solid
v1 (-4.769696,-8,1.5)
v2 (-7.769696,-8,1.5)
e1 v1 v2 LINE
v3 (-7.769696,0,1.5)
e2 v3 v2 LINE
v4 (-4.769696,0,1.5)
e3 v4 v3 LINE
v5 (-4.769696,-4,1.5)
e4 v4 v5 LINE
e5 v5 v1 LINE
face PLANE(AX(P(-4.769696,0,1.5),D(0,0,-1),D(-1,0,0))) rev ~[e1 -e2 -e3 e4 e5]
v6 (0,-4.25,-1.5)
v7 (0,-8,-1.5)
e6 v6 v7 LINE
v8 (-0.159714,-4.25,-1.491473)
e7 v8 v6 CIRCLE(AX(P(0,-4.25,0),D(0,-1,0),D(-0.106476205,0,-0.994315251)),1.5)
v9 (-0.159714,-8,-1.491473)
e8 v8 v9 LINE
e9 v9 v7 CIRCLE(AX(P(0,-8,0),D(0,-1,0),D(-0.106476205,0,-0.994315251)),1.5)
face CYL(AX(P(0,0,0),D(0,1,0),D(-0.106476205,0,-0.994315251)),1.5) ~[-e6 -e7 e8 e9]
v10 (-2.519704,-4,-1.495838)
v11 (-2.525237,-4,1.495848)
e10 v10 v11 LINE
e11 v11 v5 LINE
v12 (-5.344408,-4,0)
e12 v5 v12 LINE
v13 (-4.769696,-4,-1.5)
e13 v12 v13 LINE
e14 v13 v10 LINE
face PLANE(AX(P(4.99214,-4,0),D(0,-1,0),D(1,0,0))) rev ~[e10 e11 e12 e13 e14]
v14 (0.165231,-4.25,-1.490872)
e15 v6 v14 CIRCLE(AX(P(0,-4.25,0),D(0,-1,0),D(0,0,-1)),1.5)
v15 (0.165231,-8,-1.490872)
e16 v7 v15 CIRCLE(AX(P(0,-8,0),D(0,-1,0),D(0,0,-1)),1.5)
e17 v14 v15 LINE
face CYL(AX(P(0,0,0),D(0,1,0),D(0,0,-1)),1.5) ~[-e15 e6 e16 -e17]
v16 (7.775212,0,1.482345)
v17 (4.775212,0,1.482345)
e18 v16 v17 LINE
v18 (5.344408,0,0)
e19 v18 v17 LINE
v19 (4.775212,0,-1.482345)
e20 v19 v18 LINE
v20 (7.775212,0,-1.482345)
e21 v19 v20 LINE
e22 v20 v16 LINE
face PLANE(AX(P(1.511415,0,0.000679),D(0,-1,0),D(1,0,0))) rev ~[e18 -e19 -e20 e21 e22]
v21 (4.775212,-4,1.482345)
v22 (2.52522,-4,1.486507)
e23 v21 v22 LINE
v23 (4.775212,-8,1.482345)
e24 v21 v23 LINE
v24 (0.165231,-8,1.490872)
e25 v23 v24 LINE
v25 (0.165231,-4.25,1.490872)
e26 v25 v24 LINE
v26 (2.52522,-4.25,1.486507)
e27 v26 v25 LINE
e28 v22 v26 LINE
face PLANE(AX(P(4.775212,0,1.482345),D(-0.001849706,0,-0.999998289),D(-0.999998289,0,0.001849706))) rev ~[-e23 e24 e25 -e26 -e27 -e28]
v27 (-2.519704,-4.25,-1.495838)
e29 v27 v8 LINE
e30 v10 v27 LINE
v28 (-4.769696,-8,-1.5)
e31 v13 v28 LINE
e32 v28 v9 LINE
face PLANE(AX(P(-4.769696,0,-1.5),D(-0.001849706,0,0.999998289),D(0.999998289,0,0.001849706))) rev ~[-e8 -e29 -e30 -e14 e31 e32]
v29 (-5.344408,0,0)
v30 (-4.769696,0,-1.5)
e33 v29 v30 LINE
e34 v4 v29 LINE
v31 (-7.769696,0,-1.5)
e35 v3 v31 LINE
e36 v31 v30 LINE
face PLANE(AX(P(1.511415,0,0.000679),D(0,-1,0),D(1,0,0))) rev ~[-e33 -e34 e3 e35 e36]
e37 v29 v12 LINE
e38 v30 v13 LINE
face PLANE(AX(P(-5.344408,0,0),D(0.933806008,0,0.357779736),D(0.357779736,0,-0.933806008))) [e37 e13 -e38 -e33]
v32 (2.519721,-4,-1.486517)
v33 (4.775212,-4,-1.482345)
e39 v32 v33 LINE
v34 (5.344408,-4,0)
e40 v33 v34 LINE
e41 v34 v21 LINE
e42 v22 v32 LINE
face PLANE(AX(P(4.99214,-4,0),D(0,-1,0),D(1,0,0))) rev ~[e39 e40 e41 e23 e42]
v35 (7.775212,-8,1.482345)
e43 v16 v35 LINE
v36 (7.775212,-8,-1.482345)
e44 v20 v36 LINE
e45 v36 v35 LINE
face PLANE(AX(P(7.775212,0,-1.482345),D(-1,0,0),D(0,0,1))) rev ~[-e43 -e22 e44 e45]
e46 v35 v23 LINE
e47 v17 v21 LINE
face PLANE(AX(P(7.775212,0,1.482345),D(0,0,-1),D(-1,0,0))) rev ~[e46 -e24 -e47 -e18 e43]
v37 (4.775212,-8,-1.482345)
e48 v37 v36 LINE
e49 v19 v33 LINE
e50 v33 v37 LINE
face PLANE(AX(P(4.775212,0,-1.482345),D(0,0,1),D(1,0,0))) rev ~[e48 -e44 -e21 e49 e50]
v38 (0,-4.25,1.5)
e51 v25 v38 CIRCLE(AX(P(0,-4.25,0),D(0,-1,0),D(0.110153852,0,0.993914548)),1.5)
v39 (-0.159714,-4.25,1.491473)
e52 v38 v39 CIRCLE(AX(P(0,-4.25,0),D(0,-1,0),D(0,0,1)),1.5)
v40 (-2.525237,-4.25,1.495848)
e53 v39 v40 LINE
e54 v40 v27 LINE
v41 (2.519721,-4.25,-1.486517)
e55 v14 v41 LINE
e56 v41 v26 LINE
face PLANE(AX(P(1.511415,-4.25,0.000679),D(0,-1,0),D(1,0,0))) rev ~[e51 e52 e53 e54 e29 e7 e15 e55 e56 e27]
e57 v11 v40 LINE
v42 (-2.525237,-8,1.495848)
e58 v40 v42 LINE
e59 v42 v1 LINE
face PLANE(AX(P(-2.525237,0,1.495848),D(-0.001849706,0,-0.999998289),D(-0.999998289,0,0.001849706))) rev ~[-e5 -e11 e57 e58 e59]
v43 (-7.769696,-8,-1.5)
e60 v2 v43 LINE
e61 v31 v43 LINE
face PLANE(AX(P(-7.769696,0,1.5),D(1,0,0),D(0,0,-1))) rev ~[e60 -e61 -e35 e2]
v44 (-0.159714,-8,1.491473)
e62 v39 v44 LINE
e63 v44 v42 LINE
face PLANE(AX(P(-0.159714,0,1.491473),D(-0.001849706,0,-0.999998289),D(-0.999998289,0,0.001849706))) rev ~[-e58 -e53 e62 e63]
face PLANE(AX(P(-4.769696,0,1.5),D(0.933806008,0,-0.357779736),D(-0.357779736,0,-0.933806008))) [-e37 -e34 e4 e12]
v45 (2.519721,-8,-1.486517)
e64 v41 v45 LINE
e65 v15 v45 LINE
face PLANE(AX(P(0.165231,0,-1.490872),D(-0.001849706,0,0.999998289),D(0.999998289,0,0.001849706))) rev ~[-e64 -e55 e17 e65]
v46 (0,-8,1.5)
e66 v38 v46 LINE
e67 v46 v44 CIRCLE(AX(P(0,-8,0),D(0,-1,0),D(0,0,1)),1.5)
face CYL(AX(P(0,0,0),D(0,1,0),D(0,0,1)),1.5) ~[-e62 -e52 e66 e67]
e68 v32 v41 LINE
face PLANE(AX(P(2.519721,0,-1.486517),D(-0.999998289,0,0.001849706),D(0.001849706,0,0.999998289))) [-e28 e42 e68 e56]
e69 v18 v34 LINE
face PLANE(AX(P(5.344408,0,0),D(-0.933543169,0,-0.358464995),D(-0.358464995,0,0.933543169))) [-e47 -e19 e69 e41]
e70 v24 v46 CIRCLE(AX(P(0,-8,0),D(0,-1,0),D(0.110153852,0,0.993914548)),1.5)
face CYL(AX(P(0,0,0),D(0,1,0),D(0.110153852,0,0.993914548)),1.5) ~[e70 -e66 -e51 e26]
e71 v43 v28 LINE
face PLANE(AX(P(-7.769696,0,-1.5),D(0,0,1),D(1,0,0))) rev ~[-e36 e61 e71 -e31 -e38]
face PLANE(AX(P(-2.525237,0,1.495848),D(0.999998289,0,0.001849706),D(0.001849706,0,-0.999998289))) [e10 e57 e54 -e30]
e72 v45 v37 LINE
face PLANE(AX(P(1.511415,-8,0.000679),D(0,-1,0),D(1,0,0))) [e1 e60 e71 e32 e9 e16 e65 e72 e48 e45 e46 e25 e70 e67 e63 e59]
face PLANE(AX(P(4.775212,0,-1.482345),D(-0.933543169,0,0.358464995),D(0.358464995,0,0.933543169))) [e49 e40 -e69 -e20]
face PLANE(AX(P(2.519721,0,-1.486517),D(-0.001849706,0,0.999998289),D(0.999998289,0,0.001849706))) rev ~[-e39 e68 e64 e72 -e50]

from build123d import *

# Parameters (mm, degrees)
F1_DEPTH = 8
F2_DEPTH = 4
F3_DEPTH = 4.25


# Not quite as in the source:
# - a feature of the source that left no trace in its solid (it failed there, or was rolled back) is left out


with BuildPart() as f1:
    # F0 (on Front) → F1 (new body)
    with BuildSketch(Plane.XZ):
        with BuildLine():
            Line((2.5197209473, -1.4865167008), (2.5252201747, 1.4865065289))
            Line((2.5252201747, 1.4865065289), (0.1652307775, 1.4908718222))
            ThreePointArc((0.1652307775, 1.4908718222), (1.1175522731, 1.0005383135), (1.5, 0))
            ThreePointArc((1.5, 0), (1.1175522731, -1.0005383135), (0.1652307775, -1.4908718222))
            Line((0.1652307775, -1.4908718222), (2.5197209473, -1.4865167008))
        make_face()
        Polygon((-5.3444080986, 0), (-4.7696960071, 1.5), (-7.7696960071, 1.5), (-7.7696960071, -1.5), (-4.7696960071, -1.5), align=None)
        Polygon((7.7752124765, 1.4823446982), (4.7752124765, 1.4823446982), (5.3444080986, 0), (4.7752124765, -1.4823446982), (7.7752124765, -1.4823446982), align=None)
        with BuildLine():
            ThreePointArc((-4.7696960071, -1.5), (-5, 0), (-4.7696960071, 1.5))
            Line((-4.7696960071, 1.5), (-5.3444080986, 0))
            Line((-5.3444080986, 0), (-4.7696960071, -1.5))
        make_face()
        with BuildLine():
            Line((5.3444080986, 0), (4.7752124765, 1.4823446982))
            ThreePointArc((4.7752124765, 1.4823446982), (4.94348371, 0.7496457888), (5, 0))
            ThreePointArc((5, 0), (4.94348371, -0.7496457888), (4.7752124765, -1.4823446982))
            Line((4.7752124765, -1.4823446982), (5.3444080986, 0))
        make_face()
        with BuildLine():
            Line((-2.5252374544, 1.4958484051), (-4.7696960071, 1.5))
            ThreePointArc((-4.7696960071, 1.5), (-5, 0), (-4.7696960071, -1.5))
            Line((-4.7696960071, -1.5), (-2.5197037053, -1.4958381693))
            Line((-2.5197037053, -1.4958381693), (-2.5252374544, 1.4958484051))
        make_face()
        with BuildLine():
            ThreePointArc((5, 0), (4.94348371, 0.7496457888), (4.7752124765, 1.4823446982))
            Line((4.7752124765, 1.4823446982), (2.5252201747, 1.4865065289))
            Line((2.5252201747, 1.4865065289), (2.5197209473, -1.4865167008))
            Line((2.5197209473, -1.4865167008), (4.7752124765, -1.4823446982))
            ThreePointArc((4.7752124765, -1.4823446982), (4.94348371, -0.7496457888), (5, 0))
        make_face()
        with BuildLine():
            Line((0, 1.491177451), (-0.1597143081, 1.491472876))
            ThreePointArc((-0.1597143081, 1.491472876), (-1.5, 0), (-0.1597143081, -1.491472876))
            Line((-0.1597143081, -1.491472876), (0, -1.491177451))
            Line((0, -1.491177451), (0, 1.491177451))
        make_face()
        with BuildLine():
            Line((-0.1597143081, 1.491472876), (-2.5252374544, 1.4958484051))
            Line((-2.5252374544, 1.4958484051), (-2.5197037053, -1.4958381693))
            Line((-2.5197037053, -1.4958381693), (-0.1597143081, -1.491472876))
            ThreePointArc((-0.1597143081, -1.491472876), (-1.5, 0), (-0.1597143081, 1.491472876))
        make_face()
        with BuildLine():
            ThreePointArc((1.5, 0), (1.1175522731, 1.0005383135), (0.1652307775, 1.4908718222))
            Line((0.1652307775, 1.4908718222), (0, 1.491177451))
            Line((0, 1.491177451), (0, -1.491177451))
            Line((0, -1.491177451), (0.1652307775, -1.4908718222))
            ThreePointArc((0.1652307775, -1.4908718222), (1.1175522731, -1.0005383135), (1.5, 0))
        make_face()
        with BuildLine():
            Line((0, 1.491177451), (0.1652307775, 1.4908718222))
            ThreePointArc((0.1652307775, 1.4908718222), (0.0827413643, 1.497716217), (0, 1.5))
            Line((0, 1.5), (0, 1.491177451))
        make_face()
        with BuildLine():
            ThreePointArc((0, 1.5), (-0.0799708885, 1.497866702), (-0.1597143081, 1.491472876))
            Line((-0.1597143081, 1.491472876), (0, 1.491177451))
            Line((0, 1.491177451), (0, 1.5))
        make_face()
        with BuildLine():
            Line((0, -1.491177451), (-0.1597143081, -1.491472876))
            ThreePointArc((-0.1597143081, -1.491472876), (-0.0799708885, -1.497866702), (0, -1.5))
            Line((0, -1.5), (0, -1.491177451))
        make_face()
        with BuildLine():
            ThreePointArc((0, -1.5), (0.0827413643, -1.497716217), (0.1652307775, -1.4908718222))
            Line((0.1652307775, -1.4908718222), (0, -1.491177451))
            Line((0, -1.491177451), (0, -1.5))
        make_face()
    extrude(amount=F1_DEPTH)

    # F0 (on Front) → F2 (cut)
    with BuildSketch(Plane.XZ):
        with BuildLine():
            Line((5.3444080986, 0), (4.7752124765, 1.4823446982))
            ThreePointArc((4.7752124765, 1.4823446982), (4.94348371, 0.7496457888), (5, 0))
            ThreePointArc((5, 0), (4.94348371, -0.7496457888), (4.7752124765, -1.4823446982))
            Line((4.7752124765, -1.4823446982), (5.3444080986, 0))
        make_face()
        with BuildLine():
            ThreePointArc((5, 0), (4.94348371, 0.7496457888), (4.7752124765, 1.4823446982))
            Line((4.7752124765, 1.4823446982), (2.5252201747, 1.4865065289))
            Line((2.5252201747, 1.4865065289), (2.5197209473, -1.4865167008))
            Line((2.5197209473, -1.4865167008), (4.7752124765, -1.4823446982))
            ThreePointArc((4.7752124765, -1.4823446982), (4.94348371, -0.7496457888), (5, 0))
        make_face()
        with BuildLine():
            Line((2.5197209473, -1.4865167008), (2.5252201747, 1.4865065289))
            Line((2.5252201747, 1.4865065289), (0.1652307775, 1.4908718222))
            ThreePointArc((0.1652307775, 1.4908718222), (1.1175522731, 1.0005383135), (1.5, 0))
            ThreePointArc((1.5, 0), (1.1175522731, -1.0005383135), (0.1652307775, -1.4908718222))
            Line((0.1652307775, -1.4908718222), (2.5197209473, -1.4865167008))
        make_face()
        with BuildLine():
            ThreePointArc((1.5, 0), (1.1175522731, 1.0005383135), (0.1652307775, 1.4908718222))
            Line((0.1652307775, 1.4908718222), (0, 1.491177451))
            Line((0, 1.491177451), (0, -1.491177451))
            Line((0, -1.491177451), (0.1652307775, -1.4908718222))
            ThreePointArc((0.1652307775, -1.4908718222), (1.1175522731, -1.0005383135), (1.5, 0))
        make_face()
        with BuildLine():
            Line((0, 1.491177451), (-0.1597143081, 1.491472876))
            ThreePointArc((-0.1597143081, 1.491472876), (-1.5, 0), (-0.1597143081, -1.491472876))
            Line((-0.1597143081, -1.491472876), (0, -1.491177451))
            Line((0, -1.491177451), (0, 1.491177451))
        make_face()
        with BuildLine():
            Line((-0.1597143081, 1.491472876), (-2.5252374544, 1.4958484051))
            Line((-2.5252374544, 1.4958484051), (-2.5197037053, -1.4958381693))
            Line((-2.5197037053, -1.4958381693), (-0.1597143081, -1.491472876))
            ThreePointArc((-0.1597143081, -1.491472876), (-1.5, 0), (-0.1597143081, 1.491472876))
        make_face()
        with BuildLine():
            Line((-2.5252374544, 1.4958484051), (-4.7696960071, 1.5))
            ThreePointArc((-4.7696960071, 1.5), (-5, 0), (-4.7696960071, -1.5))
            Line((-4.7696960071, -1.5), (-2.5197037053, -1.4958381693))
            Line((-2.5197037053, -1.4958381693), (-2.5252374544, 1.4958484051))
        make_face()
        with BuildLine():
            ThreePointArc((-4.7696960071, -1.5), (-5, 0), (-4.7696960071, 1.5))
            Line((-4.7696960071, 1.5), (-5.3444080986, 0))
            Line((-5.3444080986, 0), (-4.7696960071, -1.5))
        make_face()
    extrude(amount=F2_DEPTH, mode=Mode.SUBTRACT)

    # F0 (on Front) → F3 (cut)
    with BuildSketch(Plane.XZ):
        with BuildLine():
            Line((2.5197209473, -1.4865167008), (2.5252201747, 1.4865065289))
            Line((2.5252201747, 1.4865065289), (0.1652307775, 1.4908718222))
            ThreePointArc((0.1652307775, 1.4908718222), (1.1175522731, 1.0005383135), (1.5, 0))
            ThreePointArc((1.5, 0), (1.1175522731, -1.0005383135), (0.1652307775, -1.4908718222))
            Line((0.1652307775, -1.4908718222), (2.5197209473, -1.4865167008))
        make_face()
        with BuildLine():
            ThreePointArc((1.5, 0), (1.1175522731, 1.0005383135), (0.1652307775, 1.4908718222))
            Line((0.1652307775, 1.4908718222), (0, 1.491177451))
            Line((0, 1.491177451), (0, -1.491177451))
            Line((0, -1.491177451), (0.1652307775, -1.4908718222))
            ThreePointArc((0.1652307775, -1.4908718222), (1.1175522731, -1.0005383135), (1.5, 0))
        make_face()
        with BuildLine():
            Line((-0.1597143081, 1.491472876), (-2.5252374544, 1.4958484051))
            Line((-2.5252374544, 1.4958484051), (-2.5197037053, -1.4958381693))
            Line((-2.5197037053, -1.4958381693), (-0.1597143081, -1.491472876))
            ThreePointArc((-0.1597143081, -1.491472876), (-1.5, 0), (-0.1597143081, 1.491472876))
        make_face()
        with BuildLine():
            Line((0, 1.491177451), (-0.1597143081, 1.491472876))
            ThreePointArc((-0.1597143081, 1.491472876), (-1.5, 0), (-0.1597143081, -1.491472876))
            Line((-0.1597143081, -1.491472876), (0, -1.491177451))
            Line((0, -1.491177451), (0, 1.491177451))
        make_face()
        with BuildLine():
            ThreePointArc((0, 1.5), (-0.0799708885, 1.497866702), (-0.1597143081, 1.491472876))
            Line((-0.1597143081, 1.491472876), (0, 1.491177451))
            Line((0, 1.491177451), (0, 1.5))
        make_face()
        with BuildLine():
            Line((0, 1.491177451), (0.1652307775, 1.4908718222))
            ThreePointArc((0.1652307775, 1.4908718222), (0.0827413643, 1.497716217), (0, 1.5))
            Line((0, 1.5), (0, 1.491177451))
        make_face()
        with BuildLine():
            ThreePointArc((0, -1.5), (0.0827413643, -1.497716217), (0.1652307775, -1.4908718222))
            Line((0.1652307775, -1.4908718222), (0, -1.491177451))
            Line((0, -1.491177451), (0, -1.5))
        make_face()
        with BuildLine():
            Line((0, -1.491177451), (-0.1597143081, -1.491472876))
            ThreePointArc((-0.1597143081, -1.491472876), (-0.0799708885, -1.497866702), (0, -1.5))
            Line((0, -1.5), (0, -1.491177451))
        make_face()
    extrude(amount=F3_DEPTH, mode=Mode.SUBTRACT)


solid = f1.part
